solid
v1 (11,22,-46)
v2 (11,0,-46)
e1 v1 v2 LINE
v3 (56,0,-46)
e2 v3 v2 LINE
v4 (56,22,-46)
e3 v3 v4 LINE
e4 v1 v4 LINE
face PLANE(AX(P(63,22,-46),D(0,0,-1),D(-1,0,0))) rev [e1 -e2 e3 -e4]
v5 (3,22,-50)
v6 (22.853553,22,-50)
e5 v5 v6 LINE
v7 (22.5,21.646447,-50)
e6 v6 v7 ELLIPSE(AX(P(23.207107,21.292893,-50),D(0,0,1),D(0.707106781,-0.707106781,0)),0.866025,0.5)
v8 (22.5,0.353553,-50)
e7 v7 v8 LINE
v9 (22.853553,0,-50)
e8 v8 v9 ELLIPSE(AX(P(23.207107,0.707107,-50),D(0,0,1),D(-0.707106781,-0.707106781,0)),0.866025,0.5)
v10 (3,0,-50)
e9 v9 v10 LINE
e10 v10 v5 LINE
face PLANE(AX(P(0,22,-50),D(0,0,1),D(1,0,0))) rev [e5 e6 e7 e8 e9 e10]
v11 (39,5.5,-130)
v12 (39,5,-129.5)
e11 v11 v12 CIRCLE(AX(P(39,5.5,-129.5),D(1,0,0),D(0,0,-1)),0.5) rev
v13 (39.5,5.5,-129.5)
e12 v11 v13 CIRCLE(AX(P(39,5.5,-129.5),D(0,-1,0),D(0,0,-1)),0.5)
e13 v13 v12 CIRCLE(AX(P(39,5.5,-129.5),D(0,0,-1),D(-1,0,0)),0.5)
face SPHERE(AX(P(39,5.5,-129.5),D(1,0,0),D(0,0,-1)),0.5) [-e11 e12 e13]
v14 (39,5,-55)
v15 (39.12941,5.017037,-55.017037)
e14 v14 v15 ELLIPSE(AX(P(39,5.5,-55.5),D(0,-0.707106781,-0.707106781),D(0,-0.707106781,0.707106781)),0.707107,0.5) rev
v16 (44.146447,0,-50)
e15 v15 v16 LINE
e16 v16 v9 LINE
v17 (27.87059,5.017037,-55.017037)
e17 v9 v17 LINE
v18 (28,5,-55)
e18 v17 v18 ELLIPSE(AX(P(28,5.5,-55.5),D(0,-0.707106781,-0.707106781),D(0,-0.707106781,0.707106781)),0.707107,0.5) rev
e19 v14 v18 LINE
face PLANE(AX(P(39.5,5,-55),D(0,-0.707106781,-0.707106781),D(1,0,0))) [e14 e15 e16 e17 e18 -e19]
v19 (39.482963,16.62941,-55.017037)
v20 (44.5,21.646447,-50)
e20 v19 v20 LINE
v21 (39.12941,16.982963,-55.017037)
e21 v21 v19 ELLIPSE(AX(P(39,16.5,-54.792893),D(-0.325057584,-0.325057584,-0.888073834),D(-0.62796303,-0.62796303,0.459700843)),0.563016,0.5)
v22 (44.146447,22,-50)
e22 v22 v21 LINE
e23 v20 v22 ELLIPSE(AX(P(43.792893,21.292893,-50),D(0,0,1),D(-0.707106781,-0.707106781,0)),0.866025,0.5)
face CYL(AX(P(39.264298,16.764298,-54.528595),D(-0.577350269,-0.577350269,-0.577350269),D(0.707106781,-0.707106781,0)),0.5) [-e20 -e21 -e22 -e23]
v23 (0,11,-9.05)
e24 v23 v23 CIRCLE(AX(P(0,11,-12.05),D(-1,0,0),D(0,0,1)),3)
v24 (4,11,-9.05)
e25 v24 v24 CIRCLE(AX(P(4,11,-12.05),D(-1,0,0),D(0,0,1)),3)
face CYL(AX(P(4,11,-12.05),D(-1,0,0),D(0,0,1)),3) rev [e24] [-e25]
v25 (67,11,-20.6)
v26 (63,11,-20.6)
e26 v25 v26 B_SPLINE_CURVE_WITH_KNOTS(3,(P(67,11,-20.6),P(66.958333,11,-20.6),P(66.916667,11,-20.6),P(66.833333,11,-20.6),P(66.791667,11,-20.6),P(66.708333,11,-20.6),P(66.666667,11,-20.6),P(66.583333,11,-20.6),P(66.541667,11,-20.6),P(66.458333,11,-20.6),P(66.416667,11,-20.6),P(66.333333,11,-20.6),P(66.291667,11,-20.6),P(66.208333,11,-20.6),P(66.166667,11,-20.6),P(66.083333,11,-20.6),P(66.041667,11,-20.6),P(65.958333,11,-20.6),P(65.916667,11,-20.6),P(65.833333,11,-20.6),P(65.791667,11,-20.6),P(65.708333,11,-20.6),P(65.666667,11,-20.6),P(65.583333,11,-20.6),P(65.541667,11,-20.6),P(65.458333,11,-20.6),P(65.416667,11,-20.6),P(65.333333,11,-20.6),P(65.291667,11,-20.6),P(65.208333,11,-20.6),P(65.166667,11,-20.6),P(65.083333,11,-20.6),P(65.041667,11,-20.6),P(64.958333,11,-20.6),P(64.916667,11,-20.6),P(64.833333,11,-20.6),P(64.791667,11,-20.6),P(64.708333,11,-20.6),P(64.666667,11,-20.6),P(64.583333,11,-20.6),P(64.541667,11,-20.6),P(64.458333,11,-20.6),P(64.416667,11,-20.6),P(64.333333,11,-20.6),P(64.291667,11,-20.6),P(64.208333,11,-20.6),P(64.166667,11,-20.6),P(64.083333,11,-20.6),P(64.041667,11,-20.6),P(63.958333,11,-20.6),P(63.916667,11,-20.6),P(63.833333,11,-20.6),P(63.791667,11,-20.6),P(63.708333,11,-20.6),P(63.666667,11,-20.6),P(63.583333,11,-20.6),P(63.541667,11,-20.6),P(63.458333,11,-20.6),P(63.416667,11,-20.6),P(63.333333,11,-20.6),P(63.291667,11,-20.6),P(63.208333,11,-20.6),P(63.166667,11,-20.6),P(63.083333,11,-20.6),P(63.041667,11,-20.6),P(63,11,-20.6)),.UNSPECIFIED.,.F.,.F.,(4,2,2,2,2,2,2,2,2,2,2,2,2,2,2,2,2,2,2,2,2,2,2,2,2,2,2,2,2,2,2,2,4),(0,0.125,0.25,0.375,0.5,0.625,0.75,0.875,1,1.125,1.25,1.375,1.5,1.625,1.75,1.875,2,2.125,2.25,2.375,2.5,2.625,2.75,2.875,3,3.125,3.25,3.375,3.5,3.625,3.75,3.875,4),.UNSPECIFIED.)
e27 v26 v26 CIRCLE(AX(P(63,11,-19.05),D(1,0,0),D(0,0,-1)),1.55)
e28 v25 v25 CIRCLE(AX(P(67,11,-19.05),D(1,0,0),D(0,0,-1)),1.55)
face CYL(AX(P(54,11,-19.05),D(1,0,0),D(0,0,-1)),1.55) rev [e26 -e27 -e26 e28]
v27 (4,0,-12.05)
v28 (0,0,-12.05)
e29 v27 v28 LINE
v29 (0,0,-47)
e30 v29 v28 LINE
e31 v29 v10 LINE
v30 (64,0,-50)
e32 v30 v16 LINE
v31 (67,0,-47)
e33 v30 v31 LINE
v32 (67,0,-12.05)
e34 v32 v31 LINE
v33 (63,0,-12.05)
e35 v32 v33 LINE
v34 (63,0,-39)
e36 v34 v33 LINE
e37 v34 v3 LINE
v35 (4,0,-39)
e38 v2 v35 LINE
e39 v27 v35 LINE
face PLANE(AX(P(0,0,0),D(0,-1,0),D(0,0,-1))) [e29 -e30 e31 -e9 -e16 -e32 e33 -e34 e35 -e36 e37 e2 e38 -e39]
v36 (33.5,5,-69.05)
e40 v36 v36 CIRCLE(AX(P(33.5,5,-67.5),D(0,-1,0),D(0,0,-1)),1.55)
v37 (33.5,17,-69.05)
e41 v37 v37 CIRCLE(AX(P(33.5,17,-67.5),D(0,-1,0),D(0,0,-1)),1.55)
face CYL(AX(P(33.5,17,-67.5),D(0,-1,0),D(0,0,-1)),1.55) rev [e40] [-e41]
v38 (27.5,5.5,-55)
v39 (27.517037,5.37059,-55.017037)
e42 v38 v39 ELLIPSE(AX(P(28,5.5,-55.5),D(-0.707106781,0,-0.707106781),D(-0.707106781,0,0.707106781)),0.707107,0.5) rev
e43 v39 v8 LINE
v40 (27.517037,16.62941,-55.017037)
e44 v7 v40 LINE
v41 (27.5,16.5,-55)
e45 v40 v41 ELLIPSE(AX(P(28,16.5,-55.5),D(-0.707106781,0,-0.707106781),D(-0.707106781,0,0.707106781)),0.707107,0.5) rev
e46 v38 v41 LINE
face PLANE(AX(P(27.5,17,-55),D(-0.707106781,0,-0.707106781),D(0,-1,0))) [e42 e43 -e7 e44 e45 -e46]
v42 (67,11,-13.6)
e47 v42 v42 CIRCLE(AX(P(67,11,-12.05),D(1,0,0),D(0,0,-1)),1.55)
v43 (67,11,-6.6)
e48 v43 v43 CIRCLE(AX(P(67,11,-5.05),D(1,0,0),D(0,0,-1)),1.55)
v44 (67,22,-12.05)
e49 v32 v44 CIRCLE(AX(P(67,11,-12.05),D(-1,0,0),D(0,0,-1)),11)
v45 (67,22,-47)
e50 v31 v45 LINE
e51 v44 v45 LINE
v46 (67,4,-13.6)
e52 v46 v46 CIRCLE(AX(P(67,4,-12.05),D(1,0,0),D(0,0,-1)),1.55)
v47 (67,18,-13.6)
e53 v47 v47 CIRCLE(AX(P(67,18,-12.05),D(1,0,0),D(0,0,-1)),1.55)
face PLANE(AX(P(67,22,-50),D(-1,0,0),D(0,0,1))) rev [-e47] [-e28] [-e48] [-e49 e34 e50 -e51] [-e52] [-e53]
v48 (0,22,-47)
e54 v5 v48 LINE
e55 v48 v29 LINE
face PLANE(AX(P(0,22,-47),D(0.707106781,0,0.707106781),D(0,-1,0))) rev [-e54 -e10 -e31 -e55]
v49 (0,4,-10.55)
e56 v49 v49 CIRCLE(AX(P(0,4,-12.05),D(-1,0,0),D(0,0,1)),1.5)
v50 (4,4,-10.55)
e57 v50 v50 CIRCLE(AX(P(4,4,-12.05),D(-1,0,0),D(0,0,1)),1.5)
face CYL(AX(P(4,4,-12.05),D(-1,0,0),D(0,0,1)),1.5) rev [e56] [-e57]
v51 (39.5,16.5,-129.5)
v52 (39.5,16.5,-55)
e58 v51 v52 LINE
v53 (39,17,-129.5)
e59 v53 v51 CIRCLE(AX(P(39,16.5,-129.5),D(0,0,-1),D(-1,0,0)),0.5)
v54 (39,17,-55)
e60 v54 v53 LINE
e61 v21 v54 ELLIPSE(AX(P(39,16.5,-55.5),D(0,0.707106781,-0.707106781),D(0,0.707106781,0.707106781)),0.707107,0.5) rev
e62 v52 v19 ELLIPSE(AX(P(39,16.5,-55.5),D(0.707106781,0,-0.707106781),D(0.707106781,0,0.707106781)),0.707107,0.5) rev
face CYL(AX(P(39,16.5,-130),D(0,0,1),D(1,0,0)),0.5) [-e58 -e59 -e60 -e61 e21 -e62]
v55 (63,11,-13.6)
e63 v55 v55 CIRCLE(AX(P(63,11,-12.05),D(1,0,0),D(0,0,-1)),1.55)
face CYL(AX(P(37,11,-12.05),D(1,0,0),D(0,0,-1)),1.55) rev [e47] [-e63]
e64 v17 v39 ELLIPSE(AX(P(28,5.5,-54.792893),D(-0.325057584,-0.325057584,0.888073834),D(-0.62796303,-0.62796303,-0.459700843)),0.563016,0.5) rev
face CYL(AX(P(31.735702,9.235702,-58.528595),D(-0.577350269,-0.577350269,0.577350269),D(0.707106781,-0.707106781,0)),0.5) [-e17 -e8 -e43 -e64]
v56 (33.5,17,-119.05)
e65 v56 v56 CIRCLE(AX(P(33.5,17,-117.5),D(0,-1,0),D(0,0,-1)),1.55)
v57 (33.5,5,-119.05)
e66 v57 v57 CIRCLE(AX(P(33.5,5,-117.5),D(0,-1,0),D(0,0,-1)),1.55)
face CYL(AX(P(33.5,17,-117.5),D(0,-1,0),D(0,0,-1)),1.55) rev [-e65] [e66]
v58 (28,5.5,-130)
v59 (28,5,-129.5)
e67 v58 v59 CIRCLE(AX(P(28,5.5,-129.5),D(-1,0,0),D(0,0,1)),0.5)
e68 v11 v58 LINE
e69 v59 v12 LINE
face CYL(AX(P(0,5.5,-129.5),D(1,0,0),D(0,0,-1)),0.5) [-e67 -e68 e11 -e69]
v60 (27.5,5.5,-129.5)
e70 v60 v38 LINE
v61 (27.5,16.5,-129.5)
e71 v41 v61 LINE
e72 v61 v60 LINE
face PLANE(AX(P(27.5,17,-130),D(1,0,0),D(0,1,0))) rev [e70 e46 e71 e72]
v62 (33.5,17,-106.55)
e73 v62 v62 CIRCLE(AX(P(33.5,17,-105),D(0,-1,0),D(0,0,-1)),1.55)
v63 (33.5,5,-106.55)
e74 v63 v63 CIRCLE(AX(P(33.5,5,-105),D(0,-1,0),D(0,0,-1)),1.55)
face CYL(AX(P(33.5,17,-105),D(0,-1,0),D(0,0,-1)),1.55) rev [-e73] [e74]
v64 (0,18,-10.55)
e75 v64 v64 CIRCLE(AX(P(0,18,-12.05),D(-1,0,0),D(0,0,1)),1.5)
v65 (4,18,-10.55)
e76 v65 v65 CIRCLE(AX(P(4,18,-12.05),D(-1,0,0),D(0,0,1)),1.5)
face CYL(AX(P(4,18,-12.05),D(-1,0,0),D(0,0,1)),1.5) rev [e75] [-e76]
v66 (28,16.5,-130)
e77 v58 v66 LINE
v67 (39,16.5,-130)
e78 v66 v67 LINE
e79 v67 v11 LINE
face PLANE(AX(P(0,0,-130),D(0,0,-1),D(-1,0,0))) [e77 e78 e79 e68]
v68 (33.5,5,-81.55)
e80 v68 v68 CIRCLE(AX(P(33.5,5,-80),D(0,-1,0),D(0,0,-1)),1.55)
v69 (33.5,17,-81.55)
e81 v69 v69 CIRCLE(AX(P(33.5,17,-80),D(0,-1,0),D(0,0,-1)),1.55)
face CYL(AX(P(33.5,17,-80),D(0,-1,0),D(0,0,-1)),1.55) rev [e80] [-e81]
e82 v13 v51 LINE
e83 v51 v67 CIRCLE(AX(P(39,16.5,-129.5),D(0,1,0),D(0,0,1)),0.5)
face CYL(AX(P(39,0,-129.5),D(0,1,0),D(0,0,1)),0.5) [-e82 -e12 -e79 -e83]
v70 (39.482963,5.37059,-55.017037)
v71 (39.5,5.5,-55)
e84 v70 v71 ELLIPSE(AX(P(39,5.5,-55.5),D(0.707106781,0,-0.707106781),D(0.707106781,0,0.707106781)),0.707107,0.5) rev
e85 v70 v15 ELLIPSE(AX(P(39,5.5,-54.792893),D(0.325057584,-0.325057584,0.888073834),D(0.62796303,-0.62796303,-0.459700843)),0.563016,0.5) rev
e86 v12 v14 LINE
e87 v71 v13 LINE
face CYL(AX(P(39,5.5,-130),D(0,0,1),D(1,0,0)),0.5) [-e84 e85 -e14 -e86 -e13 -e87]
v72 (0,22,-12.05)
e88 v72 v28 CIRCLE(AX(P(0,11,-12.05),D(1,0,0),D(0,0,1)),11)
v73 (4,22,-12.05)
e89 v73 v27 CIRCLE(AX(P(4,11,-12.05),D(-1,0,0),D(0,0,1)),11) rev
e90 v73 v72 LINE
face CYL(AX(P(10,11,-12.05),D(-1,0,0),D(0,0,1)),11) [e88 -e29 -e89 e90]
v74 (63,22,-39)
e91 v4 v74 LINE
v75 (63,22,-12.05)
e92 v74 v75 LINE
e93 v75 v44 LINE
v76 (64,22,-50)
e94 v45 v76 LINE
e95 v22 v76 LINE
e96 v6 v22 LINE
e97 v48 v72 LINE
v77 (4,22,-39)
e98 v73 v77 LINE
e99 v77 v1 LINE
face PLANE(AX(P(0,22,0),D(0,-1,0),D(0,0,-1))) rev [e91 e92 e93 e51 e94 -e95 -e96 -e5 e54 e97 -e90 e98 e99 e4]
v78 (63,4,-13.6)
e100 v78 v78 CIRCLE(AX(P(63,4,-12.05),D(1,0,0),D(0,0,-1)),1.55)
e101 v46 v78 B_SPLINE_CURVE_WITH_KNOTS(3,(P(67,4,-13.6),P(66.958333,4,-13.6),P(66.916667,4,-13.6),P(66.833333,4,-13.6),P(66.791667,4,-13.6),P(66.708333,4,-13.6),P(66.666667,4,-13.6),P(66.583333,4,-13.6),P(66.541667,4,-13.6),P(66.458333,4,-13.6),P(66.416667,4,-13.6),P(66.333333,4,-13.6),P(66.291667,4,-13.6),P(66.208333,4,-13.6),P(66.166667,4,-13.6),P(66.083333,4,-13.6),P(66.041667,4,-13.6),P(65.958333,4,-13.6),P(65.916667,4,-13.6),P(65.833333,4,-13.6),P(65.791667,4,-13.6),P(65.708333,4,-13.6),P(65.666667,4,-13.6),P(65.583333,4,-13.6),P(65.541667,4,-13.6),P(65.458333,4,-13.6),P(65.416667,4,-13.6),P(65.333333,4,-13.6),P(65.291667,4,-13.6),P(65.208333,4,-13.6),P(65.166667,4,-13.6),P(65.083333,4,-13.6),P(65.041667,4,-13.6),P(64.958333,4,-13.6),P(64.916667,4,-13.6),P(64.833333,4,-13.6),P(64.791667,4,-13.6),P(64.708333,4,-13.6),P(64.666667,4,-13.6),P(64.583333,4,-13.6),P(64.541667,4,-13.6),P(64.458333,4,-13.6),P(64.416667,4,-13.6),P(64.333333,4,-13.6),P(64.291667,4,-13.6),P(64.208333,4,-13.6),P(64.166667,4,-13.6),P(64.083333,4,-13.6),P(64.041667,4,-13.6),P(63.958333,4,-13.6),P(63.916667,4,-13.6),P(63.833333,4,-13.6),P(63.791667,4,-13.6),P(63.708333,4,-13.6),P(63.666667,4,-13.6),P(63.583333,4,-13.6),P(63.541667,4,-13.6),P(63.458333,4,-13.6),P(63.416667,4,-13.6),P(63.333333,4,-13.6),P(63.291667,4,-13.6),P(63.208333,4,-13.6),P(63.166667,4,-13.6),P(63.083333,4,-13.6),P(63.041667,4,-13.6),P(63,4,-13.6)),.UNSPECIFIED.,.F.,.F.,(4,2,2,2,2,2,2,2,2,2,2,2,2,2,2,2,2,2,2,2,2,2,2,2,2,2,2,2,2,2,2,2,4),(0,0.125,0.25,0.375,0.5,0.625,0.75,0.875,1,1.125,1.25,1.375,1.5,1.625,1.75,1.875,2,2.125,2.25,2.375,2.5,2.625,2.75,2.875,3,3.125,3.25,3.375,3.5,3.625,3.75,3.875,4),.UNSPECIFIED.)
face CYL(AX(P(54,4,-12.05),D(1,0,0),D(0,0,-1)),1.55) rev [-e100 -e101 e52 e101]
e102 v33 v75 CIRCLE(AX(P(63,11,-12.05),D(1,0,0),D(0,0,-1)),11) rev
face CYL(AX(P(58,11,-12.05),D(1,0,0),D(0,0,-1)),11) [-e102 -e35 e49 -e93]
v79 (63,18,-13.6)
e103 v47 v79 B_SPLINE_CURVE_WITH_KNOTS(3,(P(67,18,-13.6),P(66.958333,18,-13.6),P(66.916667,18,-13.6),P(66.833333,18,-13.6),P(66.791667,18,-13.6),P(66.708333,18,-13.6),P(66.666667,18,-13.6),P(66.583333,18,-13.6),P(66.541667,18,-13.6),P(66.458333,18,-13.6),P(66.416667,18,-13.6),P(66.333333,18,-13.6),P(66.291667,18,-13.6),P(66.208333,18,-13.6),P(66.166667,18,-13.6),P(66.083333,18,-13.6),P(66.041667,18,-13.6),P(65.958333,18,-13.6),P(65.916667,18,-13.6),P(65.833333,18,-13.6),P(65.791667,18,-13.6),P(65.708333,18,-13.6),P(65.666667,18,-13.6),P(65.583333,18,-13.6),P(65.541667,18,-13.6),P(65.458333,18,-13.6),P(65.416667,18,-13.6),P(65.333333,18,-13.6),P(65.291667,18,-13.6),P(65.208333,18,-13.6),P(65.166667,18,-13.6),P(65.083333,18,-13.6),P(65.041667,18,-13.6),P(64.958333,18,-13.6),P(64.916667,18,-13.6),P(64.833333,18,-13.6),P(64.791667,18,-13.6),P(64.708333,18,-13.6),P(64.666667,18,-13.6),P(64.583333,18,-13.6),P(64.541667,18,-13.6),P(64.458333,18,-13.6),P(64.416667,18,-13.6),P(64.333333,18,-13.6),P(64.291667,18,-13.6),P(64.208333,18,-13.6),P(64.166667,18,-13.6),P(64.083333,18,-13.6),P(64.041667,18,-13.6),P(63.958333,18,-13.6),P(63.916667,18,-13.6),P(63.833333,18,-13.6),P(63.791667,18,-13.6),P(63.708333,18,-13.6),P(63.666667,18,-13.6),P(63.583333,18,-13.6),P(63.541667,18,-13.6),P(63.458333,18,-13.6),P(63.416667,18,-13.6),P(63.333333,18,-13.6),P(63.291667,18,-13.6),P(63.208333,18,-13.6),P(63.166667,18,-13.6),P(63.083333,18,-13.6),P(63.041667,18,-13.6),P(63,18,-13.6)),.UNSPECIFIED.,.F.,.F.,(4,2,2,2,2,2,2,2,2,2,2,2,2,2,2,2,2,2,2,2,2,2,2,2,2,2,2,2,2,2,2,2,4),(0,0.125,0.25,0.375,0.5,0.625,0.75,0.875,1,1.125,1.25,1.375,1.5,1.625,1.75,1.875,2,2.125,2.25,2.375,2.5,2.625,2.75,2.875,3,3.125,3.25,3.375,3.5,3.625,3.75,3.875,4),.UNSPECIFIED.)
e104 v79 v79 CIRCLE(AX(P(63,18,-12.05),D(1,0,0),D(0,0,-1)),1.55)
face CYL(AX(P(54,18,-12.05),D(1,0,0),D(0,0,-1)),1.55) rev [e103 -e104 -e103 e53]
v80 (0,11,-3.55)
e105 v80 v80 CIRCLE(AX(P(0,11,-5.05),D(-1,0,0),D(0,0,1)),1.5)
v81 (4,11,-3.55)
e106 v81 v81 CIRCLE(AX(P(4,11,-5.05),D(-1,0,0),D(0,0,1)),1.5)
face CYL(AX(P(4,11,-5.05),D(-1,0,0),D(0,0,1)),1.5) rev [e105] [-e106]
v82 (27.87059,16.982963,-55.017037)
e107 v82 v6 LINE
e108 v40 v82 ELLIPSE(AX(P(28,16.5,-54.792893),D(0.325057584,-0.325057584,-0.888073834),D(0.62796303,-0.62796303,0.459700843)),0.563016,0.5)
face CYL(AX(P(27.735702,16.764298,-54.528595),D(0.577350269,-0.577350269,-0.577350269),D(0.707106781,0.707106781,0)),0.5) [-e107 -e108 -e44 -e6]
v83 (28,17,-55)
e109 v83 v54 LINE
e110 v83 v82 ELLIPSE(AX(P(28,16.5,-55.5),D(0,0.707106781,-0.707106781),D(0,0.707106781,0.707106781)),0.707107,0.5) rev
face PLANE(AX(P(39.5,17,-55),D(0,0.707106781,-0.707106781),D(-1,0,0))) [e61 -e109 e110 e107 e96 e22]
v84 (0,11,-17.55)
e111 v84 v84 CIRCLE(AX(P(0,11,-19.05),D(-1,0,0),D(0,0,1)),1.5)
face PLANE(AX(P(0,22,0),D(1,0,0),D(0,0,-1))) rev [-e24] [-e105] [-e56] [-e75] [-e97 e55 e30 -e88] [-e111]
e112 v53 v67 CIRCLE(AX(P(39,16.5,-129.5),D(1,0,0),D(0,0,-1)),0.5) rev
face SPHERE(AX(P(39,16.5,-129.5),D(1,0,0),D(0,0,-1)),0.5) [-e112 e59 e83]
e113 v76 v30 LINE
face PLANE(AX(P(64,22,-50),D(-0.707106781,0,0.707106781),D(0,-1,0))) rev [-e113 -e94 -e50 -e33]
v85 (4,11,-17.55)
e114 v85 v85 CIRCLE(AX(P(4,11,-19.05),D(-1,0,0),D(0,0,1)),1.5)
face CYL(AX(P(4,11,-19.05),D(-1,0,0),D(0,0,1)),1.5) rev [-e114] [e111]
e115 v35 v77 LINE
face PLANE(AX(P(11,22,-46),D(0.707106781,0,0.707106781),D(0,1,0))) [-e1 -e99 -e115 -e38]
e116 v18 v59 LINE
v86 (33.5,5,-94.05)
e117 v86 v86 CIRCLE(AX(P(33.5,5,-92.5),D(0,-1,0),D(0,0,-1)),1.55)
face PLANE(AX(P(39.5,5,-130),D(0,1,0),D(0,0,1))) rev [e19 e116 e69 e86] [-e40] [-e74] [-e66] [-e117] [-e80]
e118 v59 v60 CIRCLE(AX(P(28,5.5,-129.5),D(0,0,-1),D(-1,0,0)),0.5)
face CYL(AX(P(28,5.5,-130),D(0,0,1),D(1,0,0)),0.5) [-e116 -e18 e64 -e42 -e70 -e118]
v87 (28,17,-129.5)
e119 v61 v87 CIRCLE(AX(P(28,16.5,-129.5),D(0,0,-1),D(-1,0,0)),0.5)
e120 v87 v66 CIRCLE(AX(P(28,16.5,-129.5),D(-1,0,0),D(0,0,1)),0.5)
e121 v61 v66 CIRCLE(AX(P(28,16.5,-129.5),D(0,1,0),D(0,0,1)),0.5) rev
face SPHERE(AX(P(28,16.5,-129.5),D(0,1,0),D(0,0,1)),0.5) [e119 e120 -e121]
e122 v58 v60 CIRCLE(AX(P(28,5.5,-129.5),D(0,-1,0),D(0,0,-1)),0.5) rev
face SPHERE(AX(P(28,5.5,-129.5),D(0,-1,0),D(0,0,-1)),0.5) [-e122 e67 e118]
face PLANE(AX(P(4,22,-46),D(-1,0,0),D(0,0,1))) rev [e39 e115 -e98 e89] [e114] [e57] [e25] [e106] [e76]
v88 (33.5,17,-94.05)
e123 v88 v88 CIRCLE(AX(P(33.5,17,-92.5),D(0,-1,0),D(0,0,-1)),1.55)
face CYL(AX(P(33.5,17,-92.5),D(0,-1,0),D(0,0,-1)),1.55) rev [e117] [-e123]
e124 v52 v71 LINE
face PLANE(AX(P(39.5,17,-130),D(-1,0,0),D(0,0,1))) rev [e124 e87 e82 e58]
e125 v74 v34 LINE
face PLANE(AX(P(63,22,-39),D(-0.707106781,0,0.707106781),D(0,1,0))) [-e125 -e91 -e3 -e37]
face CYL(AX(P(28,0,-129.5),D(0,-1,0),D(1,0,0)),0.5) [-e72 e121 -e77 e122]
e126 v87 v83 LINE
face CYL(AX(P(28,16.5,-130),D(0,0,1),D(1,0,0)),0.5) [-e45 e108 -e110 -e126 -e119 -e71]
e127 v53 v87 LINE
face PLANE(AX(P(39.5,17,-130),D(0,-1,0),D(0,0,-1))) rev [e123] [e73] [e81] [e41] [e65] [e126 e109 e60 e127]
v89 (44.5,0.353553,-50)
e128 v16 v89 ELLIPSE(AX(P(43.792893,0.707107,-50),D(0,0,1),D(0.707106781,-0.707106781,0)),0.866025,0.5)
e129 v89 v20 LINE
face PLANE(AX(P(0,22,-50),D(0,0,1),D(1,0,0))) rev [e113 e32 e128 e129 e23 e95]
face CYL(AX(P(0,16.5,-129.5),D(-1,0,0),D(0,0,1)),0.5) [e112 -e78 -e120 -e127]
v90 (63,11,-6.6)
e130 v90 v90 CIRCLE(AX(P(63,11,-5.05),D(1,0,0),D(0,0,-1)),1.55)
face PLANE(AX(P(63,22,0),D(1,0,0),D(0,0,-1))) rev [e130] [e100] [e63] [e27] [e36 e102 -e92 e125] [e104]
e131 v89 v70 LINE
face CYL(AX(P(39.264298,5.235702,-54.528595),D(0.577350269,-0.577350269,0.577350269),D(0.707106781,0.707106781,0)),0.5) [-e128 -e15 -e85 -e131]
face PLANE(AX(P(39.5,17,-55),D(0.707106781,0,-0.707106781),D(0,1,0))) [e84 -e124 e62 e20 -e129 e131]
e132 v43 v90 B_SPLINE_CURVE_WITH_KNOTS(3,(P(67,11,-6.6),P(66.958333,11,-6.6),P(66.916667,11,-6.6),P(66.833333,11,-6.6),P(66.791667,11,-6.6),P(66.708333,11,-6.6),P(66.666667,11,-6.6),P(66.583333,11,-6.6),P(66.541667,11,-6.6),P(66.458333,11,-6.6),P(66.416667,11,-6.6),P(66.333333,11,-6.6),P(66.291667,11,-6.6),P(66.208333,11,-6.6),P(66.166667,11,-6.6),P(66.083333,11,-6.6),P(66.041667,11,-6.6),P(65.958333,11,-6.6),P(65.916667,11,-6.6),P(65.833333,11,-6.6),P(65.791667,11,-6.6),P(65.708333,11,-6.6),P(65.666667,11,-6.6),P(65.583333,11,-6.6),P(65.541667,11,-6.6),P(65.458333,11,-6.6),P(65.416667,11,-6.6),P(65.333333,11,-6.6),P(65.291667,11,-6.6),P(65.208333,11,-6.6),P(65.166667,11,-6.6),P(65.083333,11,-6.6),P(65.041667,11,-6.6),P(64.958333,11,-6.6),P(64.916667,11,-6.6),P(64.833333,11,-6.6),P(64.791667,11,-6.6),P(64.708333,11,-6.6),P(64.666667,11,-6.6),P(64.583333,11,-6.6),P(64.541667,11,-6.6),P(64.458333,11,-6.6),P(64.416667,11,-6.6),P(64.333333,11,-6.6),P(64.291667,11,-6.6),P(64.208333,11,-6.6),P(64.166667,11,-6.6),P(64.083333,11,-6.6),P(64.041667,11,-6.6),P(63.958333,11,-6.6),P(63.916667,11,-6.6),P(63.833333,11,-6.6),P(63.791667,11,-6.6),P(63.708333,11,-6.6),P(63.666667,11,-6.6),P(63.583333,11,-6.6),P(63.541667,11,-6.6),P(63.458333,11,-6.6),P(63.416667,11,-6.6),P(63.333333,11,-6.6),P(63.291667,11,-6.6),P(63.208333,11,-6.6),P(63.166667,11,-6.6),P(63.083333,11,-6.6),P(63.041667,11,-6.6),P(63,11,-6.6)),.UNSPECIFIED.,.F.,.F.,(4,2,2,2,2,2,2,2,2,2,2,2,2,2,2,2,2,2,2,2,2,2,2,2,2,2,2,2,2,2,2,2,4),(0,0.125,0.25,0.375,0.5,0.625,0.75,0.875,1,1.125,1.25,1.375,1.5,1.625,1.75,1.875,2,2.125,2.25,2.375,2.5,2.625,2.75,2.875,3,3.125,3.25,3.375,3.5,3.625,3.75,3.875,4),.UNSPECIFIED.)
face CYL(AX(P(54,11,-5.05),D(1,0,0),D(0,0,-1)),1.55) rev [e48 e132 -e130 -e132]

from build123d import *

# Parameters (mm, degrees)
BOSS_EXTRUDE1_DEPTH      = 22
SKETCH3_R                = 1.55
CUT_EXTRUDE1_DEPTH       = 30
CUT_EXTRUDE5_DEPTH       = 9
SKETCH11_R               = 1.55
CUT_EXTRUDE10_DEPTH      = 13
CUT_EXTRUDE11_START      = -10
CUT_EXTRUDE11_DEPTH      = 10
SKETCH13_R               = 3
SKETCH13_R_2             = 1.5
CUT_EXTRUDE12_DEPTH      = 4
SKETCH14_W               = 54
SKETCH14_H               = 9.3
SKETCH14_W_2             = 7.05
SKETCH14_H_2             = 4
BOSS_EXTRUDE4_DEPTH      = 4
SKETCH17_W               = 7.05
SKETCH17_H               = 4
BOSS_EXTRUDE5_DEPTH      = 23.05
BOSS_EXTRUDE6_DEPTH      = 27.3
BOSS_EXTRUDE6_DEPTH_BACK = 4
SKETCH18_W               = 54
SKETCH18_H               = 2.95
SKETCH19_W               = 54
SKETCH19_H               = 2.8
BOSS_EXTRUDE7_DEPTH      = 21
FILLET2_SIZE             = 6.5
FILLET3_SIZE             = 0.5
SKETCH20_R               = 3.970030919
BOSS_EXTRUDE8_DEPTH      = 6
FILLET4_R                = 1
CUT_EXTRUDE13_START      = -37.3
CUT_EXTRUDE13_DEPTH      = 37.3
SKETCH22_W               = 56.118071471
SKETCH22_H               = 11.813110758
CUT_EXTRUDE14_DEPTH      = 56
SKETCH23_W               = 67
SKETCH23_H               = 4
BOSS_EXTRUDE9_DEPTH      = 4
SKETCH24_W               = 67
SKETCH24_H               = 4
BOSS_EXTRUDE10_DEPTH     = 4
SKETCH25_W               = 12
SKETCH25_H               = 12
BOSS_EXTRUDE11_DEPTH     = 80
FILLET6_SIZE             = 7
SKETCH27_W               = 67
SKETCH27_H               = 4
CUT_EXTRUDE16_DEPTH      = 80
FILLET7_SIZE             = 5
SKETCH29_R               = 1.55
CUT_EXTRUDE17_DEPTH      = 12
FILLET8_R                = 0.5
FILLET9_R                = 0.5
FILLET10_SIZE            = 3


# Read off the part's stored shape, not the designer's step: Cut-Extrude13
with BuildPart() as part:
    # Sketch1 → Boss-Extrude1 (new body)
    with BuildSketch(Plane(origin=(0, 0, 0), x_dir=(1, 0, 0), z_dir=(0, 1, 0))):
        Polygon((0, 0), (0, 50), (67, 50), (67, 0), (63, 0), (63, 46), (4, 46), (4, 0), align=None)
    extrude(amount=BOSS_EXTRUDE1_DEPTH)

    # Sketch3 → Cut-Extrude1 (cut)
    with BuildSketch(Plane(origin=(67, 0, 0), x_dir=(0, 0, -1), z_dir=(1, 0, 0))):
        with Locations((12.05, 11)):
            Circle(SKETCH3_R)
    extrude(amount=-CUT_EXTRUDE1_DEPTH, mode=Mode.SUBTRACT)

    # Sketch5 → Cut-Extrude5 (cut)
    with BuildSketch(Plane(origin=(67, 0, 0), x_dir=(0, 0, -1), z_dir=(1, 0, 0))):
        with BuildLine():
            Line((12.05, 22), (0, 22))
            Line((0, 22), (0, 0))
            Line((0, 0), (12.05, 0))
            ThreePointArc((12.05, 0), (1.05, 11), (12.05, 22))
        make_face()
    extrude(amount=-CUT_EXTRUDE5_DEPTH, mode=Mode.SUBTRACT)

    # Sketch11 → Cut-Extrude10 (cut)
    with BuildSketch(Plane(origin=(67, 0, 0), x_dir=(0, 0, -1), z_dir=(1, 0, 0))):
        with Locations((19.05, 11)):
            Circle(SKETCH11_R)
        with Locations((12.05, 18)):
            Circle(SKETCH11_R)
        with Locations((12.05, 4)):
            Circle(SKETCH11_R)
        with Locations((5.05, 11)):
            Circle(SKETCH11_R)
    extrude(amount=-CUT_EXTRUDE10_DEPTH, mode=Mode.SUBTRACT)

    # Sketch12 → Cut-Extrude11 (cut)
    with BuildSketch(Plane.ZY.offset(CUT_EXTRUDE11_START)):
        with BuildLine():
            Line((-12.05, 22), (0, 22))
            Line((0, 22), (0, 0))
            Line((0, 0), (-12.05, 0))
            ThreePointArc((-12.05, 0), (-1.05, 11), (-12.05, 22))
        make_face()
    extrude(amount=CUT_EXTRUDE11_DEPTH, mode=Mode.SUBTRACT)

    # Sketch13 → Cut-Extrude12 (cut)
    with BuildSketch(Plane.ZY):
        with Locations((-12.05, 11)):
            Circle(SKETCH13_R)
        with Locations((-19.05, 11)):
            Circle(SKETCH13_R_2)
        with Locations((-12.05, 4)):
            Circle(SKETCH13_R_2)
        with Locations((-5.05, 11)):
            Circle(SKETCH13_R_2)
        with Locations((-12.05, 18)):
            Circle(SKETCH13_R_2)
    extrude(amount=-CUT_EXTRUDE12_DEPTH, mode=Mode.SUBTRACT)

    # Sketch14 → Boss-Extrude4 (add)
    with BuildSketch(Plane(origin=(0, 0, -50), x_dir=(-1, 0, 0), z_dir=(0, 0, -1))):
        with Locations((-33.5, -4.65)):
            Rectangle(SKETCH14_W, SKETCH14_H)
        with Locations((-56.975, 20)):
            Rectangle(SKETCH14_W_2, SKETCH14_H_2)
        with Locations((-10.025, 20)):
            Rectangle(SKETCH14_W_2, SKETCH14_H_2)
    extrude(amount=-BOSS_EXTRUDE4_DEPTH)

    # Sketch17 → Boss-Extrude5 (add)
    with BuildSketch(Plane(origin=(0, 0, -50), x_dir=(-1, 0, 0), z_dir=(0, 0, -1))):
        with Locations((-56.975, 20)):
            Rectangle(SKETCH17_W, SKETCH17_H)
        with Locations((-10.025, 20)):
            Rectangle(SKETCH17_W, SKETCH17_H)
    extrude(amount=BOSS_EXTRUDE5_DEPTH)

    # Sketch18 → Boss-Extrude6 (add, two sides: drawn at the far end of the back side and taken through both)
    with BuildSketch(Plane.XZ.offset(-18).offset(-BOSS_EXTRUDE6_DEPTH_BACK)):
        with Locations((33.5, -71.575)):
            Rectangle(SKETCH18_W, SKETCH18_H)
    extrude(amount=BOSS_EXTRUDE6_DEPTH + BOSS_EXTRUDE6_DEPTH_BACK)

    # Sketch19 → Boss-Extrude7 (add)
    with BuildSketch(Plane(origin=(0, 0, -50), x_dir=(-1, 0, 0), z_dir=(0, 0, -1))):
        with Locations((-33.5, -7.9)):
            Rectangle(SKETCH19_W, SKETCH19_H)
    extrude(amount=BOSS_EXTRUDE7_DEPTH)

    # Fillet2
    fillet2_edges = [part.edges().sort_by_distance(p)[0] for p in [
        (60.5, 20, -50),
        (6.5, 20, -50),
    ]]
    chamfer(fillet2_edges, length=FILLET2_SIZE - 0.0001)  # a hair under: the kernel refuses the full size

    # Fillet3
    fillet3_edges = [part.edges().sort_by_distance(p)[0] for p in [
        (60.5, 6.35, -73.05),
        (6.5, 6.35, -73.05),
    ]]
    chamfer(fillet3_edges, length=FILLET3_SIZE)

    # Sketch20 → Boss-Extrude8 (add)
    with BuildSketch(Plane.XZ.offset(9.3)):
        with Locations(Location((23.4, -59.65, 0), (0, 0, 270))):
            Circle(SKETCH20_R)
    extrude(amount=BOSS_EXTRUDE8_DEPTH)

    # Fillet4
    fillet4_edges = [part.edges().sort_by_distance(p)[0] for p in [
        (23.4, -15.3, -55.679969081),
    ]]
    fillet(fillet4_edges, radius=FILLET4_R)

    # Cut-Extrude13 outline → Cut-Extrude13 (cut)
    with BuildSketch(Plane(origin=(0, 22, 0), x_dir=(1, 0, 0), z_dir=(0, 1, 0)).offset(CUT_EXTRUDE13_START)):
        Polygon((67, 50), (60.5, 56.5), (60.5, 72.55), (60, 73.05), (7, 73.05), (6.5, 72.55), (6.5, 56.5), (0, 50), align=None)
    extrude(amount=CUT_EXTRUDE13_DEPTH, mode=Mode.SUBTRACT)

    # Sketch22 → Cut-Extrude14 (cut)
    with BuildSketch(Plane(origin=(0, 0, -50), x_dir=(-1, 0, 0), z_dir=(0, 0, -1))):
        with Locations((-32.440964265, -5.906555379)):
            Rectangle(SKETCH22_W, SKETCH22_H)
    extrude(amount=-CUT_EXTRUDE14_DEPTH, mode=Mode.SUBTRACT)

    # Sketch23 → Boss-Extrude9 (add)
    with BuildSketch(Plane(origin=(0, 22, 0), x_dir=(1, 0, 0), z_dir=(0, 1, 0))):
        with Locations((33.5, 48)):
            Rectangle(SKETCH23_W, SKETCH23_H)
    extrude(amount=BOSS_EXTRUDE9_DEPTH)

    # Sketch24 → Boss-Extrude10 (add)
    with BuildSketch(Plane.XZ):
        with Locations((33.5, -48)):
            Rectangle(SKETCH24_W, SKETCH24_H)
    extrude(amount=BOSS_EXTRUDE10_DEPTH)

    # Sketch25 → Boss-Extrude11 (add)
    with BuildSketch(Plane(origin=(0, 0, -50), x_dir=(-1, 0, 0), z_dir=(0, 0, -1))):
        with Locations((-33.5, 11)):
            Rectangle(SKETCH25_W, SKETCH25_H)
    extrude(amount=BOSS_EXTRUDE11_DEPTH)

    # Fillet6
    fillet6_edges = [part.edges().sort_by_distance(p)[0] for p in [
        (63, 11, -46),
        (4, 11, -46),
    ]]
    chamfer(fillet6_edges, length=FILLET6_SIZE)

    # Sketch27 → Cut-Extrude16 (cut)
    with BuildSketch(Plane.XY.offset(-46)):
        with Locations((33.5, 24)):
            Rectangle(SKETCH27_W, SKETCH27_H)
        with Locations((33.5, -2)):
            Rectangle(SKETCH27_W, SKETCH27_H)
    extrude(amount=-CUT_EXTRUDE16_DEPTH, mode=Mode.SUBTRACT)

    # Fillet7
    fillet7_edges = [part.edges().sort_by_distance(p)[0] for p in [
        (39.5, 11, -50),
        (33.5, 5, -50),
        (27.5, 11, -50),
        (33.5, 17, -50),
    ]]
    chamfer(fillet7_edges, length=FILLET7_SIZE - 0.0001)  # a hair under: the kernel refuses the full size

    # Sketch29 → Cut-Extrude17 (cut)
    with BuildSketch(Plane.XZ.offset(-5)):
        with Locations(Location((33.5, -67.5, 0), (0, 0, 270))):
            Circle(SKETCH29_R)
        with Locations(Location((33.5, -80, 0), (0, 0, 270))):
            Circle(SKETCH29_R)
        with Locations(Location((33.5, -92.5, 0), (0, 0, 270))):
            Circle(SKETCH29_R)
        with Locations(Location((33.5, -105, 0), (0, 0, 270))):
            Circle(SKETCH29_R)
        with Locations(Location((33.5, -117.5, 0), (0, 0, 270))):
            Circle(SKETCH29_R)
    extrude(amount=-CUT_EXTRUDE17_DEPTH, mode=Mode.SUBTRACT)

    # Fillet8
    fillet8_edges = [part.edges().sort_by_distance(p)[0] for p in [
        (39.5, 17, -92.49995),
        (39.5, 5, -92.49995),
        (27.5, 5, -92.49995),
        (27.5, 17, -92.49995),
        (39.5, 11, -130),
        (33.5, 5, -130),
        (27.5, 11, -130),
        (33.5, 17, -130),
    ]]
    fillet(fillet8_edges, radius=FILLET8_R)

    # Fillet9
    fillet9_edges = [part.edges().sort_by_distance(p)[0] for p in [
        (41.926726695, 19.426726695, -52.573173305),
        (41.926726695, 2.573273305, -52.573173305),
        (25.073273305, 19.426726695, -52.573173305),
        (25.073273305, 2.573273305, -52.573173305),
    ]]
    fillet(fillet9_edges, radius=FILLET9_R)

    # Fillet10
    fillet10_edges = [part.edges().sort_by_distance(p)[0] for p in [
        (0, 11, -50),
        (67, 11, -50),
    ]]
    chamfer(fillet10_edges, length=FILLET10_SIZE)


solid = part.part
